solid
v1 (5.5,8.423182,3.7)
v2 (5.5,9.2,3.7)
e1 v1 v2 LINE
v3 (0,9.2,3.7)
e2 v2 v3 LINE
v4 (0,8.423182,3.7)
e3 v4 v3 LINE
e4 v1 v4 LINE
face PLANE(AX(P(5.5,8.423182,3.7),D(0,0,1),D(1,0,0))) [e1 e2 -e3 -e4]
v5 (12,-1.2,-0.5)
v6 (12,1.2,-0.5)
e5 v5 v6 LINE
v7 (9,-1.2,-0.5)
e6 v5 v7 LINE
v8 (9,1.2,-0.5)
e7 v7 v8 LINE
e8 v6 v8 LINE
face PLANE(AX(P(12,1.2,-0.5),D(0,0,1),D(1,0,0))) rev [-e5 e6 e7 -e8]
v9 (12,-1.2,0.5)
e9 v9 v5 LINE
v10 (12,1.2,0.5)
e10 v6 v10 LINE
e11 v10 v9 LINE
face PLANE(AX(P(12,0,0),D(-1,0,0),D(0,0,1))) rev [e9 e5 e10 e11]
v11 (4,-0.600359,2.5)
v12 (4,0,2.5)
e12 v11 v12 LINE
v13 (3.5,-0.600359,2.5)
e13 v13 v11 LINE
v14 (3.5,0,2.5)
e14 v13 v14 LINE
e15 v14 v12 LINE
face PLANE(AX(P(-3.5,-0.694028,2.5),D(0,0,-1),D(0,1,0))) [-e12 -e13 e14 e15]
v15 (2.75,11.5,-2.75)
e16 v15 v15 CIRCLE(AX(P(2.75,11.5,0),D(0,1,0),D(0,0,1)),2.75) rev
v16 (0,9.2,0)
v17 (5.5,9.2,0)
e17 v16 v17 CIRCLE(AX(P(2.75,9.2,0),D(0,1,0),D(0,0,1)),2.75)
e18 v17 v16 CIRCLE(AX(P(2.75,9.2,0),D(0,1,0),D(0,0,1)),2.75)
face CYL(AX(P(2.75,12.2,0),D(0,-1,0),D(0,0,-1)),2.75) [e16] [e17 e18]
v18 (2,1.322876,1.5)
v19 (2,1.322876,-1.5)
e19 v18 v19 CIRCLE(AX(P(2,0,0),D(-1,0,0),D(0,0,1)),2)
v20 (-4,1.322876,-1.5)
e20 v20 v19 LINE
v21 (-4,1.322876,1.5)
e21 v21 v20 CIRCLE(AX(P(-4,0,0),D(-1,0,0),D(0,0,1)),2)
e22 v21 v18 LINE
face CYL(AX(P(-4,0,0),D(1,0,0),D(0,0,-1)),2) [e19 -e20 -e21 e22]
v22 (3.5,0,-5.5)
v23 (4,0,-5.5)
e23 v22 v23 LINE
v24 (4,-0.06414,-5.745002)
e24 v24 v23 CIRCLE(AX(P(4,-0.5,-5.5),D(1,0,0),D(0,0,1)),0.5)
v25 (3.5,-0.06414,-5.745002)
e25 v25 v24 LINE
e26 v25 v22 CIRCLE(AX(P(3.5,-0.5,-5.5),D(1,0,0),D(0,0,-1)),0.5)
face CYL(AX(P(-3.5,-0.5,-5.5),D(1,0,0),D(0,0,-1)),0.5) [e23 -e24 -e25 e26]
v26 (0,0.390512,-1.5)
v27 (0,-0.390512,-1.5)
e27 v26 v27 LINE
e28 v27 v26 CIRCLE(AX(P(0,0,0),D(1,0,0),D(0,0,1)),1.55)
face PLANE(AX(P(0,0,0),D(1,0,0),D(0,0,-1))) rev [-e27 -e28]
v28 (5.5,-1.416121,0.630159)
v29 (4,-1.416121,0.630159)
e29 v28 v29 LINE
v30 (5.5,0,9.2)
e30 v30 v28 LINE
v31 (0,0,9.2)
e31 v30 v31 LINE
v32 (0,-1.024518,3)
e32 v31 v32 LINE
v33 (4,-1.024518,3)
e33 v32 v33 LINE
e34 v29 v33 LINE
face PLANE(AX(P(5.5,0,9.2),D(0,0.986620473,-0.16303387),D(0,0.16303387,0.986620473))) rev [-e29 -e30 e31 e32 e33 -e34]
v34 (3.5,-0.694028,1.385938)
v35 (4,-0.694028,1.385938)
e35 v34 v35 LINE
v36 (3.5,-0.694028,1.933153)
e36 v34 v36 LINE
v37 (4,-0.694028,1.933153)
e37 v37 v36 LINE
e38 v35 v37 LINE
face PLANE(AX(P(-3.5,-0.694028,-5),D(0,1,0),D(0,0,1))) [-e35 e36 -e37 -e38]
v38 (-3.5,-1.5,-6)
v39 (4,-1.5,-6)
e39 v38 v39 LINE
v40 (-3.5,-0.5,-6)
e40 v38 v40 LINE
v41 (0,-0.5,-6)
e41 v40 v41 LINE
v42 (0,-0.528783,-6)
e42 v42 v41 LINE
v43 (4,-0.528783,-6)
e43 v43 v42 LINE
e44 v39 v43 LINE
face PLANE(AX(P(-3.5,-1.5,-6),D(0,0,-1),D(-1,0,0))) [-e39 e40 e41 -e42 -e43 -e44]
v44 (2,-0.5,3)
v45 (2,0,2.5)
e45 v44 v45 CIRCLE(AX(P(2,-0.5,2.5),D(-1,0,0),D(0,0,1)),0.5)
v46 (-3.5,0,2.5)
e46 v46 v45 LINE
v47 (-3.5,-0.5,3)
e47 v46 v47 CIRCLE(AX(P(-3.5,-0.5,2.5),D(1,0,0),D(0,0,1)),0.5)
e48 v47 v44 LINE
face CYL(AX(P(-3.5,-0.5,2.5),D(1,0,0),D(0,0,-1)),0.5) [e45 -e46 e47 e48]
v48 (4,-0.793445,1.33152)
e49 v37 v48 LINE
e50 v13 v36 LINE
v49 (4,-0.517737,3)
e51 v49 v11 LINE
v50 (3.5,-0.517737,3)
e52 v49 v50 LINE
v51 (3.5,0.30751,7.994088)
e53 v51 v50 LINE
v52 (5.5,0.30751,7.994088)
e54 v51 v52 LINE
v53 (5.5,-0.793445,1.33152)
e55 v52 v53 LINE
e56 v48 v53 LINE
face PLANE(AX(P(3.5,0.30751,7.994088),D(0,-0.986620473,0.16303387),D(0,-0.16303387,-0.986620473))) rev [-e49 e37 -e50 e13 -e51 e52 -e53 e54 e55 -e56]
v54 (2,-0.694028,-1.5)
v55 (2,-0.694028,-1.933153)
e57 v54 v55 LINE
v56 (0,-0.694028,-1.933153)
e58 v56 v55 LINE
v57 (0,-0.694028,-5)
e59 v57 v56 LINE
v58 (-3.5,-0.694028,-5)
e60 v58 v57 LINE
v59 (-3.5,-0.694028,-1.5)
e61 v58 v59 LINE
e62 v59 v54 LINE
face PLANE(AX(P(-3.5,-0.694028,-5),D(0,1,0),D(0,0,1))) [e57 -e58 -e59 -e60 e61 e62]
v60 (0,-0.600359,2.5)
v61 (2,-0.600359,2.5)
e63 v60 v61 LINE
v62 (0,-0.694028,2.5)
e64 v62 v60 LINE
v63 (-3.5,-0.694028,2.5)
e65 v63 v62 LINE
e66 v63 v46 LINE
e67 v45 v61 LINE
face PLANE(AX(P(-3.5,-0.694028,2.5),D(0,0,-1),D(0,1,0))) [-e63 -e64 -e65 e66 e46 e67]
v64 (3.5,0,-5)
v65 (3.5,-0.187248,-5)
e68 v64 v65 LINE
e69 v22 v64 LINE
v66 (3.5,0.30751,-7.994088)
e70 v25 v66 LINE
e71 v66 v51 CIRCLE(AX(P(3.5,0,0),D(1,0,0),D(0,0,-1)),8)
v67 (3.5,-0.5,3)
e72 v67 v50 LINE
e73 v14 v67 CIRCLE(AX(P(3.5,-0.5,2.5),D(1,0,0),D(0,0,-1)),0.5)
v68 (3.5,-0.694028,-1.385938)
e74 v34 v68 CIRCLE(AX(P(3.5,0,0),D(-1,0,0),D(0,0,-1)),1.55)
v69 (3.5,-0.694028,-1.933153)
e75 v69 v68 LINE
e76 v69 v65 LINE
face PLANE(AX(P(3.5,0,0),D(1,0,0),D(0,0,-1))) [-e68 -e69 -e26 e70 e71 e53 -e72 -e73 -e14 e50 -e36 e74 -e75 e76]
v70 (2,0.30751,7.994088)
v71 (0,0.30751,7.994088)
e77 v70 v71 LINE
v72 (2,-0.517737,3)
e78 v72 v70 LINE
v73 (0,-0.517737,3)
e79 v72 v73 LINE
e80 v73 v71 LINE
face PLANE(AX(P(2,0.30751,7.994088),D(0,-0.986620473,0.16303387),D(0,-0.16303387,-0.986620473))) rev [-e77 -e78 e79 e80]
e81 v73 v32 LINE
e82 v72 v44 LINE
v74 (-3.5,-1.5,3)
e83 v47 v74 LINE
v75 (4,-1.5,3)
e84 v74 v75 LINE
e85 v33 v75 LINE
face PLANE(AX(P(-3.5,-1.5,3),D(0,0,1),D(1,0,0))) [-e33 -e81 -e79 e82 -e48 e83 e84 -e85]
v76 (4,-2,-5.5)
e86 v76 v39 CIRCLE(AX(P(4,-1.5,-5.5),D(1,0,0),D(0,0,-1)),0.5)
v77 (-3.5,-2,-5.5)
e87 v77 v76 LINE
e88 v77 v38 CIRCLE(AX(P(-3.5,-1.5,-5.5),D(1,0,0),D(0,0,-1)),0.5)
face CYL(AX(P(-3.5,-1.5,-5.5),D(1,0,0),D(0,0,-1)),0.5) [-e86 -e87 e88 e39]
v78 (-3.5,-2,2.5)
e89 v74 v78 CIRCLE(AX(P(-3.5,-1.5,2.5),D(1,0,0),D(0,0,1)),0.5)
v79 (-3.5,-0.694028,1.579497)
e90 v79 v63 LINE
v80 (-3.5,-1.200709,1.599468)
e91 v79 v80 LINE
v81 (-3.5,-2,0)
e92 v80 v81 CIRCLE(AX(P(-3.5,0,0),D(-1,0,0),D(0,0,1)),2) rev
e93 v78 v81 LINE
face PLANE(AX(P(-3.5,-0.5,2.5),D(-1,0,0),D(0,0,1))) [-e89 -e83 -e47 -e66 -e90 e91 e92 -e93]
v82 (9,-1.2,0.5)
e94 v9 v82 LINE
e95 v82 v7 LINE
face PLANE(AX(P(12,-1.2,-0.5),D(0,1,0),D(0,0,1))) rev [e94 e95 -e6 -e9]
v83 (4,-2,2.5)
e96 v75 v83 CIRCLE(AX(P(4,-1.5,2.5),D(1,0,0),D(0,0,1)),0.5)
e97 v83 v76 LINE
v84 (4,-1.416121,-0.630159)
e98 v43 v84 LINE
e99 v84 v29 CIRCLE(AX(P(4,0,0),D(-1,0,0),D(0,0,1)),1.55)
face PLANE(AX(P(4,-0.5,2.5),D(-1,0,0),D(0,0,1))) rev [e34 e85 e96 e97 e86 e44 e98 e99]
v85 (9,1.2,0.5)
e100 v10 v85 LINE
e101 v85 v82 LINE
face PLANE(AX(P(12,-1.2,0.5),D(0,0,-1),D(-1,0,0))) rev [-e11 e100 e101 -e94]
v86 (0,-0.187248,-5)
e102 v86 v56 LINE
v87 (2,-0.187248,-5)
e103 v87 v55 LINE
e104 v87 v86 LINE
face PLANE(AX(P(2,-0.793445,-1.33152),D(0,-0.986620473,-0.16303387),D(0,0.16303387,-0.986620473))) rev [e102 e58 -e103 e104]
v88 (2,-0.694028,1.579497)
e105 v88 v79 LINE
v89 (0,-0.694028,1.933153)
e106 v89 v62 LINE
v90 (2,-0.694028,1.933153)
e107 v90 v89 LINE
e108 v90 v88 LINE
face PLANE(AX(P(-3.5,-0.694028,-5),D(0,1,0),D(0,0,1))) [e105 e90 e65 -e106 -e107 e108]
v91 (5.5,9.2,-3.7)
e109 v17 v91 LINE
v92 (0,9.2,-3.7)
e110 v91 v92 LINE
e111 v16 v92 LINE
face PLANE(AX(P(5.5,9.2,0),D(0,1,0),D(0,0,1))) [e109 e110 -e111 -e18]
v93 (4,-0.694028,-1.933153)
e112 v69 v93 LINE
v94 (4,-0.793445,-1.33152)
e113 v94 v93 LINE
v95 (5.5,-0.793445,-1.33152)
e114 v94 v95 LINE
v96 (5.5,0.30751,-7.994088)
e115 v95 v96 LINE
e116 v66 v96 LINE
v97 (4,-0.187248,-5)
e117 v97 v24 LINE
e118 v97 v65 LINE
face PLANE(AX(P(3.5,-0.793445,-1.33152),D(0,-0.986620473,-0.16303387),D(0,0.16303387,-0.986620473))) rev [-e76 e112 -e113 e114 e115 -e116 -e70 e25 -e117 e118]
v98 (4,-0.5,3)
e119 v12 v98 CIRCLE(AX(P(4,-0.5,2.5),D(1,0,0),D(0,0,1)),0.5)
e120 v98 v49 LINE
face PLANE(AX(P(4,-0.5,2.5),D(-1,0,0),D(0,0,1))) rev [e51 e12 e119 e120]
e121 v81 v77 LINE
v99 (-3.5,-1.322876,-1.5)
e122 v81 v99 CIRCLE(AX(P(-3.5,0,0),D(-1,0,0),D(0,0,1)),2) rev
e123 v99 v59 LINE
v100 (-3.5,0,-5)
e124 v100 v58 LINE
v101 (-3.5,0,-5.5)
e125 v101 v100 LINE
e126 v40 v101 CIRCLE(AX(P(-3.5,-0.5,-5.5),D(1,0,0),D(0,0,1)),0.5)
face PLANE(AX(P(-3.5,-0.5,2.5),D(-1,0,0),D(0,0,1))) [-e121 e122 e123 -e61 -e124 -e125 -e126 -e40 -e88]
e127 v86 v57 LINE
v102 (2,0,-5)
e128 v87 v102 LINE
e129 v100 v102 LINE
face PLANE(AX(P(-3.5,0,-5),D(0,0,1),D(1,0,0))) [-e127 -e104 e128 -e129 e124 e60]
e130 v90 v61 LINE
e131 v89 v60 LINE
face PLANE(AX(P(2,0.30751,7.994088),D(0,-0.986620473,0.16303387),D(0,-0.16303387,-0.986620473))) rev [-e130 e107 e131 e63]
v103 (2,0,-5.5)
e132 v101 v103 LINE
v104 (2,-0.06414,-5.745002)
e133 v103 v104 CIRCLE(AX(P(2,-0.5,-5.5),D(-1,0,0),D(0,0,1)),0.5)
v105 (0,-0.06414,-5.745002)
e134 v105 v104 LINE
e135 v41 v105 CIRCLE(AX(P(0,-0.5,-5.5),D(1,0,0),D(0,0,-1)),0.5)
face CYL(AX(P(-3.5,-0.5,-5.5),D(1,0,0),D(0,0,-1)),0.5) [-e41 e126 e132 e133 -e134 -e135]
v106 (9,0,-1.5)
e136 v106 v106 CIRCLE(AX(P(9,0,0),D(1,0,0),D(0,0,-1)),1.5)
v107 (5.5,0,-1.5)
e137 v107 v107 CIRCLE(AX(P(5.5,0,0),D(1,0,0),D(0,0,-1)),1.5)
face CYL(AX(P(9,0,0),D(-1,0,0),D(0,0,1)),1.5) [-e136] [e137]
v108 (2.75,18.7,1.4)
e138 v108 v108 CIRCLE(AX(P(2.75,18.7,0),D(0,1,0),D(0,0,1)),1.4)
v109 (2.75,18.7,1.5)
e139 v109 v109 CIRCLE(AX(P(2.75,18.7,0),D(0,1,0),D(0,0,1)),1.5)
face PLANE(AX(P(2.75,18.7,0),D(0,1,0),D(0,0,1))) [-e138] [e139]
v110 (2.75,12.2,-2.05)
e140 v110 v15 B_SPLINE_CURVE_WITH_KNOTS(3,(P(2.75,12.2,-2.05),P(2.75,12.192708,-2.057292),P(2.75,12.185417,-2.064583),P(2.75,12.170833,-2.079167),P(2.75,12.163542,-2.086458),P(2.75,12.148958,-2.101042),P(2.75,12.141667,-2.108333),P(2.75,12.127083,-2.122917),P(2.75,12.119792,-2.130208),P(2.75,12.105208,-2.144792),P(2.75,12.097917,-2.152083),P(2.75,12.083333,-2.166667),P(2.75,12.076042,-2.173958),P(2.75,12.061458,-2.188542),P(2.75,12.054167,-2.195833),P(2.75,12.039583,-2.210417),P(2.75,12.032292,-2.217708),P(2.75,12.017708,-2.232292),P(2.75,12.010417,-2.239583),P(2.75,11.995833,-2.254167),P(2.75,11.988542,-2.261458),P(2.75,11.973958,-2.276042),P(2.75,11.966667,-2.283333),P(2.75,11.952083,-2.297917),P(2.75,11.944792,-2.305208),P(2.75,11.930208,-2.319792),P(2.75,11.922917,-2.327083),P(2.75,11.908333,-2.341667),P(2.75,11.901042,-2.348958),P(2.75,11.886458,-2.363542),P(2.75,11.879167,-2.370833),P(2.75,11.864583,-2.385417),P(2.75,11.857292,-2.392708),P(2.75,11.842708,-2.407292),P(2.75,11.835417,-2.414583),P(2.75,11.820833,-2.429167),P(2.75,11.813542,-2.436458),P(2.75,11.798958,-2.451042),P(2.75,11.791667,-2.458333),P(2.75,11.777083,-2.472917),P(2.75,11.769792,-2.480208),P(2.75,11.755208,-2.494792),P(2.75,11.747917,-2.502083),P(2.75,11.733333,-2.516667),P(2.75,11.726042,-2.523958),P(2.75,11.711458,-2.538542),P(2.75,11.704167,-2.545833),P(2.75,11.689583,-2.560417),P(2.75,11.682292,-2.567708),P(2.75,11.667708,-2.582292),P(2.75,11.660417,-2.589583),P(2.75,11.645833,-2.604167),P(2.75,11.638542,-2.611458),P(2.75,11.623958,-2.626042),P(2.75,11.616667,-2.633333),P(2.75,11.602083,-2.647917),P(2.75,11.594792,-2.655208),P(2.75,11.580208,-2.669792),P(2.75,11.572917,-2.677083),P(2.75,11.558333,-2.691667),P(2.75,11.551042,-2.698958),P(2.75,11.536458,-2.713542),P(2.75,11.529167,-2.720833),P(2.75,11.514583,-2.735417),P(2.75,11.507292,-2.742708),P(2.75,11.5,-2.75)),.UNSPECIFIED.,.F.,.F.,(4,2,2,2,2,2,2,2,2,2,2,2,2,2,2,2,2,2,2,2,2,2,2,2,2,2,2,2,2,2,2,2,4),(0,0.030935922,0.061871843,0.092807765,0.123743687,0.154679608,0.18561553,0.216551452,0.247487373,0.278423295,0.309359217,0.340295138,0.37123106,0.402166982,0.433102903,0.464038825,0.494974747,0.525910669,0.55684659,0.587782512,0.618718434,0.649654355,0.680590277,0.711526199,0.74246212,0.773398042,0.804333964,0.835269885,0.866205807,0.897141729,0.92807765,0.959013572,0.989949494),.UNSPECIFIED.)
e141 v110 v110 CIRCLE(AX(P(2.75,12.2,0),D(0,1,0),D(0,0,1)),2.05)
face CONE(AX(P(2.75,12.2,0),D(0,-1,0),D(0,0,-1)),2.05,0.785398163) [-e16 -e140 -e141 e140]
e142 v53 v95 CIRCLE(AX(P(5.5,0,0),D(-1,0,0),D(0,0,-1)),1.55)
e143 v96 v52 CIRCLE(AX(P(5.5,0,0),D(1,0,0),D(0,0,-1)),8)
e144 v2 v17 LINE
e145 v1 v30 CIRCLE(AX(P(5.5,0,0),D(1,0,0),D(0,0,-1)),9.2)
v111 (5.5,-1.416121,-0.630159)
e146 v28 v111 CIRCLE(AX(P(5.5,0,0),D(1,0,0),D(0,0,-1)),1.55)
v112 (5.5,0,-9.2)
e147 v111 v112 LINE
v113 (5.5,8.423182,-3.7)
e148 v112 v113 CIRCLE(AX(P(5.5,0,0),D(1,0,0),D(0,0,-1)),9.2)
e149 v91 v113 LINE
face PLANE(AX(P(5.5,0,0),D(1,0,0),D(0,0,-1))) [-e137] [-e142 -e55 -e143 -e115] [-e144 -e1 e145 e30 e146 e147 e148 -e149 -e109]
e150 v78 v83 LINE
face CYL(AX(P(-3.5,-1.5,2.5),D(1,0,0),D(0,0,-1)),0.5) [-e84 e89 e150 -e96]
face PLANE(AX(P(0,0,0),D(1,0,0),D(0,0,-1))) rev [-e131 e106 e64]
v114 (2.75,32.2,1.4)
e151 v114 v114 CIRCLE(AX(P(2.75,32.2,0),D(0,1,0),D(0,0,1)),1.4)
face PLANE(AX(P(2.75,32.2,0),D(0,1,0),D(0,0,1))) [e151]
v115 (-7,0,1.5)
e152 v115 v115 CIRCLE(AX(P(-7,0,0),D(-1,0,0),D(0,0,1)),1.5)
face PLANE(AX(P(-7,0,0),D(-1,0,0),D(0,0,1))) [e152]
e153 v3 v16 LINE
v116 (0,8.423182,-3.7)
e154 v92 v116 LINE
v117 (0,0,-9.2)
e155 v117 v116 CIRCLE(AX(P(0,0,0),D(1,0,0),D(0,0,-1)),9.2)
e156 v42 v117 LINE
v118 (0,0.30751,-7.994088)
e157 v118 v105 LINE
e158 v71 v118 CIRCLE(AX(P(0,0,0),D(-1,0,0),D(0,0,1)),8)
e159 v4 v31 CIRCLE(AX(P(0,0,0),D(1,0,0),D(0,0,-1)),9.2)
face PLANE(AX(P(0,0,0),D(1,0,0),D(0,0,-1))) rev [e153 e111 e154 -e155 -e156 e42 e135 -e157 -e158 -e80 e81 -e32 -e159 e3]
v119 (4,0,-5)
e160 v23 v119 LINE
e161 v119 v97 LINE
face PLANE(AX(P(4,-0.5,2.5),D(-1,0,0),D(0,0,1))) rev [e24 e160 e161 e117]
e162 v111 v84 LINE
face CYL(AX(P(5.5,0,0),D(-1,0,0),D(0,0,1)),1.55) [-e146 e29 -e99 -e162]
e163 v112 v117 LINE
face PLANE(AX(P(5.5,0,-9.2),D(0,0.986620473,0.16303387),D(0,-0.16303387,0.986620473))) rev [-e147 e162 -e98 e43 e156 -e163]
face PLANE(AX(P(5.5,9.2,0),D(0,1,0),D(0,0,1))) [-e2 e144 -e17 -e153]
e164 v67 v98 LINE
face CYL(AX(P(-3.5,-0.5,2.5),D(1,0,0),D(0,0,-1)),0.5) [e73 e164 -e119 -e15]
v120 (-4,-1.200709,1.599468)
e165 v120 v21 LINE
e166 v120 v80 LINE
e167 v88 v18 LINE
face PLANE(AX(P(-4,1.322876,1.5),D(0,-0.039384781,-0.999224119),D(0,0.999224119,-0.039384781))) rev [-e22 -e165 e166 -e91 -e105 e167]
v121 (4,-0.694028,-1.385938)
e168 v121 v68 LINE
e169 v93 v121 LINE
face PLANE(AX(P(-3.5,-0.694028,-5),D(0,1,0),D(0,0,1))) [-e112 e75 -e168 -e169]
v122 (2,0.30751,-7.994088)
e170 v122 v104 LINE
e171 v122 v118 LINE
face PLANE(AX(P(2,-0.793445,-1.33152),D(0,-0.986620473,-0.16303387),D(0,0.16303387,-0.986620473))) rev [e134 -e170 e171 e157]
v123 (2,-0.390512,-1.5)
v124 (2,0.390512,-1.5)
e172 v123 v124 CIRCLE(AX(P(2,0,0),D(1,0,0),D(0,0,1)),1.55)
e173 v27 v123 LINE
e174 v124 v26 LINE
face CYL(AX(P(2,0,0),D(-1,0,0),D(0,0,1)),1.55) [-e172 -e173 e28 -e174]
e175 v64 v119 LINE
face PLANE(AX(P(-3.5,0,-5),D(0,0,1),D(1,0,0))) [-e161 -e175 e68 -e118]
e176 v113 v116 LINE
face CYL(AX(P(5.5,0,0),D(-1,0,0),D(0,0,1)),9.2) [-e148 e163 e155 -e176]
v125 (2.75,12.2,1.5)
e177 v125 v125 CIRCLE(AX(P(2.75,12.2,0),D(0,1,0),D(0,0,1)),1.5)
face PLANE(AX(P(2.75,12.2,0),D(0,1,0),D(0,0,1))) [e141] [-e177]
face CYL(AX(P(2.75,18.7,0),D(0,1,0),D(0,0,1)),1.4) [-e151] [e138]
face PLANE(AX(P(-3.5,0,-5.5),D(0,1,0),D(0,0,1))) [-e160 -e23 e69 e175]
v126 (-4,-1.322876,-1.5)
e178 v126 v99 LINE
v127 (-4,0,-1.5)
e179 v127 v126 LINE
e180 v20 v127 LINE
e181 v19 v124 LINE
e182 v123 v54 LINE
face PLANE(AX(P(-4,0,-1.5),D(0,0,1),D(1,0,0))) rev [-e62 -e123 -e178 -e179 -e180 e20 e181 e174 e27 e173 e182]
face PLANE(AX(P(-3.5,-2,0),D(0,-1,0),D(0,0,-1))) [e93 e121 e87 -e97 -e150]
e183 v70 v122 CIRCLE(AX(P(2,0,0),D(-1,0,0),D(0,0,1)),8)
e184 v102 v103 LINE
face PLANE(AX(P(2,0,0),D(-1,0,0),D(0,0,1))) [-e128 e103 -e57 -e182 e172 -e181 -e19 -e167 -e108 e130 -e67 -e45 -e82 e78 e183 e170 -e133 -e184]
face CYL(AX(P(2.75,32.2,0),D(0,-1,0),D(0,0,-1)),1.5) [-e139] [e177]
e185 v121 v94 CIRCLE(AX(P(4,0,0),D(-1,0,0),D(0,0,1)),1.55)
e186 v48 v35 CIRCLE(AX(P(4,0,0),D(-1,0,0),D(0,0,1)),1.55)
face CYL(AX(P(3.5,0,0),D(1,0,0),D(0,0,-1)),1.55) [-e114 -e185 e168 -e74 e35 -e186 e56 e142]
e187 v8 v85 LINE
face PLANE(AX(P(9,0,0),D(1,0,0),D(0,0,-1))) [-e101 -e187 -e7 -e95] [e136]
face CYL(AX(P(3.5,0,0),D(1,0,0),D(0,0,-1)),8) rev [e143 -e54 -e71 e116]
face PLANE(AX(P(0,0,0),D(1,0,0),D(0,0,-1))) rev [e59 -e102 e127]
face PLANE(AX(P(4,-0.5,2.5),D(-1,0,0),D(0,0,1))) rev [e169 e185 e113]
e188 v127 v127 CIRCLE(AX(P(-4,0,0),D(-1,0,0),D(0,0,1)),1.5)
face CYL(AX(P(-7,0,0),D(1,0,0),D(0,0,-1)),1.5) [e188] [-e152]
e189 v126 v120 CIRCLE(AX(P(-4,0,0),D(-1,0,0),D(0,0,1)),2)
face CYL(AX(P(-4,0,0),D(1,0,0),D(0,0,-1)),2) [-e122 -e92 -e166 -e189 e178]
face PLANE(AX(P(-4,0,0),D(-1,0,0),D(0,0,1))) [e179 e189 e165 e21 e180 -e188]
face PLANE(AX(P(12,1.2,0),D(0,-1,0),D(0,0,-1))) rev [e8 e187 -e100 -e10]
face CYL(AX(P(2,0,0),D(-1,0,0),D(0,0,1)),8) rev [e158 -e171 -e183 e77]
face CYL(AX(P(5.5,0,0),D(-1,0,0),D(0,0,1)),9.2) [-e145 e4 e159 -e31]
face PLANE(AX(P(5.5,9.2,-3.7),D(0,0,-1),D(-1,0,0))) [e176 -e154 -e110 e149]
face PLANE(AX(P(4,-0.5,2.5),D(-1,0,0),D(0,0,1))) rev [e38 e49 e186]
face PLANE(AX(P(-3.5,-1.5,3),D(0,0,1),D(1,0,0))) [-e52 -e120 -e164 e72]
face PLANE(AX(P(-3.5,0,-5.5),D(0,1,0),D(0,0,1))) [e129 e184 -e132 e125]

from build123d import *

# Parameters (mm, degrees)
EXTRUDE_1_DEPTH     = 5.5
CUT_EXTRUDE_START   = -2
CUT_EXTRUDE_1_DEPTH = 2
CUT_EXTRUDE_2_DEPTH = 2
EXTRUDE_2_DEPTH     = 5.5
SKETCH_5_R          = 2.75
EXTRUDE_3_DEPTH     = 3
CHAMFER_1_SIZE      = 0.7
SKETCH_6_R          = 1.5
EXTRUDE_4_DEPTH     = 20
SKETCH_7_R          = 1.5
EXTRUDE_5_DEPTH     = 7
EXTRUDE_START       = 3.5
SKETCH_8_R          = 1.5
EXTRUDE_6_DEPTH     = 3.5
EXTRUDE_7_DEPTH     = 3
EXTRUDE_8_DEPTH     = 7.5
EXTRUDE_9_DEPTH     = 6
SKETCH_12_R         = 2.369511938
SKETCH_12_R_2       = 1.4
CUT_EXTRUDE_3_DEPTH = 13.5


with BuildPart() as part:
    # 草图1 → 凸台-拉伸1 (new body)
    with BuildSketch(Plane(origin=(0, 0, 0), x_dir=(0, 0, -1), z_dir=(1, 0, 0))):
        with BuildLine():
            Line((-9.2, 0), (-0.630158831, -1.41612141))
            ThreePointArc((-0.630158831, -1.41612141), (0, -1.55), (0.630158831, -1.41612141))
            Line((0.630158831, -1.41612141), (9.2, 0))
            ThreePointArc((9.2, 0), (0, 9.2), (-9.2, 0))
        make_face()
    extrude(amount=EXTRUDE_1_DEPTH)

    # 草图2 → 切除-拉伸1 (cut)
    with BuildSketch(Plane(origin=(5.5, 0, 0), x_dir=(0, 0, -1), z_dir=(1, 0, 0)).offset(CUT_EXTRUDE_START)):
        with BuildLine():
            Line((-7.994087674, 0.307509782), (-1.331520023, -0.79344466))
            ThreePointArc((-1.331520023, -0.79344466), (0, 1.55), (1.331520023, -0.79344466))
            Line((1.331520023, -0.79344466), (7.994087674, 0.307509782))
            ThreePointArc((7.994087674, 0.307509782), (0, 8), (-7.994087674, 0.307509782))
        make_face()
    extrude(amount=CUT_EXTRUDE_1_DEPTH, mode=Mode.SUBTRACT)

    # 草图3 → 切除-拉伸2 (cut)
    with BuildSketch(Plane.ZY):
        with BuildLine():
            Line((-1.331520023, -0.79344466), (-7.994087674, 0.307509782))
            ThreePointArc((-7.994087674, 0.307509782), (0, 8), (7.994087674, 0.307509782))
            Line((7.994087674, 0.307509782), (1.331520023, -0.79344466))
            ThreePointArc((1.331520023, -0.79344466), (0, 1.55), (-1.331520023, -0.79344466))
        make_face()
    extrude(amount=-CUT_EXTRUDE_2_DEPTH, mode=Mode.SUBTRACT)

    # 草图4 → 凸台-拉伸2 (add)
    with BuildSketch(Plane.ZY):
        Polygon((0, 9.2), (-3.7, 9.2), (-3.7, 8.423182296), (3.7, 8.423182296), (3.7, 9.2), align=None)
    extrude(amount=-EXTRUDE_2_DEPTH)

    # 草图5 → 凸台-拉伸3 (add)
    with BuildSketch(Plane(origin=(0, 9.2, 0), x_dir=(1, 0, 0), z_dir=(0, 1, 0))):
        with Locations((2.75, 0)):
            Circle(SKETCH_5_R)
    extrude(amount=EXTRUDE_3_DEPTH)

    # Chamfer 1
    chamfer_1_edges = [part.edges().sort_by_distance(p)[0] for p in [
        (0, 12.2, 0),
    ]]
    chamfer(chamfer_1_edges, length=CHAMFER_1_SIZE)

    # 草图6 → 凸台-拉伸4 (add)
    with BuildSketch(Plane(origin=(0, 12.2, 0), x_dir=(1, 0, 0), z_dir=(0, 1, 0))):
        with Locations((2.75, 0)):
            Circle(SKETCH_6_R)
    extrude(amount=EXTRUDE_4_DEPTH)

    # 草图7 → 凸台-拉伸5 (add)
    with BuildSketch(Plane.ZY):
        Circle(SKETCH_7_R)
    extrude(amount=EXTRUDE_5_DEPTH)

    # 草图8 → 凸台-拉伸6 (add)
    with BuildSketch(Plane(origin=(5.5, 0, 0), x_dir=(0, 0, -1), z_dir=(1, 0, 0)).offset(EXTRUDE_START)):
        Circle(SKETCH_8_R)
    extrude(amount=-EXTRUDE_6_DEPTH)

    # 草图9 → 凸台-拉伸7 (add)
    with BuildSketch(Plane(origin=(9, 0, 0), x_dir=(0, 0, -1), z_dir=(1, 0, 0))):
        Polygon((0, 1.2), (0.5, 1.2), (0.5, -1.2), (-0.5, -1.2), (-0.5, 1.2), align=None)
    extrude(amount=EXTRUDE_7_DEPTH)

    # 草图10 → 凸台-拉伸8 (add)
    with BuildSketch(Plane(origin=(4, 0, 0), x_dir=(0, 0, -1), z_dir=(1, 0, 0))):
        with BuildLine():
            Line((5.5, 0), (5, 0))
            Line((5, 0), (5, -0.694028023))
            Line((5, -0.694028023), (-2.5, -0.694028023))
            Line((-2.5, -0.694028023), (-2.5, 0))
            ThreePointArc((-2.5, 0), (-2.853553391, -0.146446609), (-3, -0.5))
            Line((-3, -0.5), (-3, -1.5))
            ThreePointArc((-3, -1.5), (-2.853553391, -1.853553391), (-2.5, -2))
            Line((-2.5, -2), (0, -2))
            Line((0, -2), (5.5, -2))
            ThreePointArc((5.5, -2), (5.853553391, -1.853553391), (6, -1.5))
            Line((6, -1.5), (6, -0.5))
            ThreePointArc((6, -0.5), (5.853553391, -0.146446609), (5.5, 0))
        make_face()
    extrude(amount=-EXTRUDE_8_DEPTH)

    # 草图11 → 凸台-拉伸9 (add)
    with BuildSketch(Plane.ZY.offset(-2)):
        with BuildLine():
            Line((-1.5, 0), (-1.5, 1.322875656))
            ThreePointArc((-1.5, 1.322875656), (0, 2), (1.5, 1.322875656))
            Line((1.5, 1.322875656), (1.599468005, -1.200709))
            ThreePointArc((1.599468005, -1.200709), (0.078769562, -1.998448237), (-1.5, -1.322875656))
            Line((-1.5, -1.322875656), (-1.5, 0))
        make_face()
    extrude(amount=EXTRUDE_9_DEPTH)

    # 草图12 → 切除-拉伸3 (cut)
    with BuildSketch(Plane(origin=(0, 32.2, 0), x_dir=(1, 0, 0), z_dir=(0, 1, 0))):
        with Locations((2.75, 0)):
            Circle(SKETCH_12_R)
        with Locations((2.75, 0)):
            Circle(SKETCH_12_R_2, mode=Mode.SUBTRACT)
    extrude(amount=-CUT_EXTRUDE_3_DEPTH, mode=Mode.SUBTRACT)


solid = part.part
